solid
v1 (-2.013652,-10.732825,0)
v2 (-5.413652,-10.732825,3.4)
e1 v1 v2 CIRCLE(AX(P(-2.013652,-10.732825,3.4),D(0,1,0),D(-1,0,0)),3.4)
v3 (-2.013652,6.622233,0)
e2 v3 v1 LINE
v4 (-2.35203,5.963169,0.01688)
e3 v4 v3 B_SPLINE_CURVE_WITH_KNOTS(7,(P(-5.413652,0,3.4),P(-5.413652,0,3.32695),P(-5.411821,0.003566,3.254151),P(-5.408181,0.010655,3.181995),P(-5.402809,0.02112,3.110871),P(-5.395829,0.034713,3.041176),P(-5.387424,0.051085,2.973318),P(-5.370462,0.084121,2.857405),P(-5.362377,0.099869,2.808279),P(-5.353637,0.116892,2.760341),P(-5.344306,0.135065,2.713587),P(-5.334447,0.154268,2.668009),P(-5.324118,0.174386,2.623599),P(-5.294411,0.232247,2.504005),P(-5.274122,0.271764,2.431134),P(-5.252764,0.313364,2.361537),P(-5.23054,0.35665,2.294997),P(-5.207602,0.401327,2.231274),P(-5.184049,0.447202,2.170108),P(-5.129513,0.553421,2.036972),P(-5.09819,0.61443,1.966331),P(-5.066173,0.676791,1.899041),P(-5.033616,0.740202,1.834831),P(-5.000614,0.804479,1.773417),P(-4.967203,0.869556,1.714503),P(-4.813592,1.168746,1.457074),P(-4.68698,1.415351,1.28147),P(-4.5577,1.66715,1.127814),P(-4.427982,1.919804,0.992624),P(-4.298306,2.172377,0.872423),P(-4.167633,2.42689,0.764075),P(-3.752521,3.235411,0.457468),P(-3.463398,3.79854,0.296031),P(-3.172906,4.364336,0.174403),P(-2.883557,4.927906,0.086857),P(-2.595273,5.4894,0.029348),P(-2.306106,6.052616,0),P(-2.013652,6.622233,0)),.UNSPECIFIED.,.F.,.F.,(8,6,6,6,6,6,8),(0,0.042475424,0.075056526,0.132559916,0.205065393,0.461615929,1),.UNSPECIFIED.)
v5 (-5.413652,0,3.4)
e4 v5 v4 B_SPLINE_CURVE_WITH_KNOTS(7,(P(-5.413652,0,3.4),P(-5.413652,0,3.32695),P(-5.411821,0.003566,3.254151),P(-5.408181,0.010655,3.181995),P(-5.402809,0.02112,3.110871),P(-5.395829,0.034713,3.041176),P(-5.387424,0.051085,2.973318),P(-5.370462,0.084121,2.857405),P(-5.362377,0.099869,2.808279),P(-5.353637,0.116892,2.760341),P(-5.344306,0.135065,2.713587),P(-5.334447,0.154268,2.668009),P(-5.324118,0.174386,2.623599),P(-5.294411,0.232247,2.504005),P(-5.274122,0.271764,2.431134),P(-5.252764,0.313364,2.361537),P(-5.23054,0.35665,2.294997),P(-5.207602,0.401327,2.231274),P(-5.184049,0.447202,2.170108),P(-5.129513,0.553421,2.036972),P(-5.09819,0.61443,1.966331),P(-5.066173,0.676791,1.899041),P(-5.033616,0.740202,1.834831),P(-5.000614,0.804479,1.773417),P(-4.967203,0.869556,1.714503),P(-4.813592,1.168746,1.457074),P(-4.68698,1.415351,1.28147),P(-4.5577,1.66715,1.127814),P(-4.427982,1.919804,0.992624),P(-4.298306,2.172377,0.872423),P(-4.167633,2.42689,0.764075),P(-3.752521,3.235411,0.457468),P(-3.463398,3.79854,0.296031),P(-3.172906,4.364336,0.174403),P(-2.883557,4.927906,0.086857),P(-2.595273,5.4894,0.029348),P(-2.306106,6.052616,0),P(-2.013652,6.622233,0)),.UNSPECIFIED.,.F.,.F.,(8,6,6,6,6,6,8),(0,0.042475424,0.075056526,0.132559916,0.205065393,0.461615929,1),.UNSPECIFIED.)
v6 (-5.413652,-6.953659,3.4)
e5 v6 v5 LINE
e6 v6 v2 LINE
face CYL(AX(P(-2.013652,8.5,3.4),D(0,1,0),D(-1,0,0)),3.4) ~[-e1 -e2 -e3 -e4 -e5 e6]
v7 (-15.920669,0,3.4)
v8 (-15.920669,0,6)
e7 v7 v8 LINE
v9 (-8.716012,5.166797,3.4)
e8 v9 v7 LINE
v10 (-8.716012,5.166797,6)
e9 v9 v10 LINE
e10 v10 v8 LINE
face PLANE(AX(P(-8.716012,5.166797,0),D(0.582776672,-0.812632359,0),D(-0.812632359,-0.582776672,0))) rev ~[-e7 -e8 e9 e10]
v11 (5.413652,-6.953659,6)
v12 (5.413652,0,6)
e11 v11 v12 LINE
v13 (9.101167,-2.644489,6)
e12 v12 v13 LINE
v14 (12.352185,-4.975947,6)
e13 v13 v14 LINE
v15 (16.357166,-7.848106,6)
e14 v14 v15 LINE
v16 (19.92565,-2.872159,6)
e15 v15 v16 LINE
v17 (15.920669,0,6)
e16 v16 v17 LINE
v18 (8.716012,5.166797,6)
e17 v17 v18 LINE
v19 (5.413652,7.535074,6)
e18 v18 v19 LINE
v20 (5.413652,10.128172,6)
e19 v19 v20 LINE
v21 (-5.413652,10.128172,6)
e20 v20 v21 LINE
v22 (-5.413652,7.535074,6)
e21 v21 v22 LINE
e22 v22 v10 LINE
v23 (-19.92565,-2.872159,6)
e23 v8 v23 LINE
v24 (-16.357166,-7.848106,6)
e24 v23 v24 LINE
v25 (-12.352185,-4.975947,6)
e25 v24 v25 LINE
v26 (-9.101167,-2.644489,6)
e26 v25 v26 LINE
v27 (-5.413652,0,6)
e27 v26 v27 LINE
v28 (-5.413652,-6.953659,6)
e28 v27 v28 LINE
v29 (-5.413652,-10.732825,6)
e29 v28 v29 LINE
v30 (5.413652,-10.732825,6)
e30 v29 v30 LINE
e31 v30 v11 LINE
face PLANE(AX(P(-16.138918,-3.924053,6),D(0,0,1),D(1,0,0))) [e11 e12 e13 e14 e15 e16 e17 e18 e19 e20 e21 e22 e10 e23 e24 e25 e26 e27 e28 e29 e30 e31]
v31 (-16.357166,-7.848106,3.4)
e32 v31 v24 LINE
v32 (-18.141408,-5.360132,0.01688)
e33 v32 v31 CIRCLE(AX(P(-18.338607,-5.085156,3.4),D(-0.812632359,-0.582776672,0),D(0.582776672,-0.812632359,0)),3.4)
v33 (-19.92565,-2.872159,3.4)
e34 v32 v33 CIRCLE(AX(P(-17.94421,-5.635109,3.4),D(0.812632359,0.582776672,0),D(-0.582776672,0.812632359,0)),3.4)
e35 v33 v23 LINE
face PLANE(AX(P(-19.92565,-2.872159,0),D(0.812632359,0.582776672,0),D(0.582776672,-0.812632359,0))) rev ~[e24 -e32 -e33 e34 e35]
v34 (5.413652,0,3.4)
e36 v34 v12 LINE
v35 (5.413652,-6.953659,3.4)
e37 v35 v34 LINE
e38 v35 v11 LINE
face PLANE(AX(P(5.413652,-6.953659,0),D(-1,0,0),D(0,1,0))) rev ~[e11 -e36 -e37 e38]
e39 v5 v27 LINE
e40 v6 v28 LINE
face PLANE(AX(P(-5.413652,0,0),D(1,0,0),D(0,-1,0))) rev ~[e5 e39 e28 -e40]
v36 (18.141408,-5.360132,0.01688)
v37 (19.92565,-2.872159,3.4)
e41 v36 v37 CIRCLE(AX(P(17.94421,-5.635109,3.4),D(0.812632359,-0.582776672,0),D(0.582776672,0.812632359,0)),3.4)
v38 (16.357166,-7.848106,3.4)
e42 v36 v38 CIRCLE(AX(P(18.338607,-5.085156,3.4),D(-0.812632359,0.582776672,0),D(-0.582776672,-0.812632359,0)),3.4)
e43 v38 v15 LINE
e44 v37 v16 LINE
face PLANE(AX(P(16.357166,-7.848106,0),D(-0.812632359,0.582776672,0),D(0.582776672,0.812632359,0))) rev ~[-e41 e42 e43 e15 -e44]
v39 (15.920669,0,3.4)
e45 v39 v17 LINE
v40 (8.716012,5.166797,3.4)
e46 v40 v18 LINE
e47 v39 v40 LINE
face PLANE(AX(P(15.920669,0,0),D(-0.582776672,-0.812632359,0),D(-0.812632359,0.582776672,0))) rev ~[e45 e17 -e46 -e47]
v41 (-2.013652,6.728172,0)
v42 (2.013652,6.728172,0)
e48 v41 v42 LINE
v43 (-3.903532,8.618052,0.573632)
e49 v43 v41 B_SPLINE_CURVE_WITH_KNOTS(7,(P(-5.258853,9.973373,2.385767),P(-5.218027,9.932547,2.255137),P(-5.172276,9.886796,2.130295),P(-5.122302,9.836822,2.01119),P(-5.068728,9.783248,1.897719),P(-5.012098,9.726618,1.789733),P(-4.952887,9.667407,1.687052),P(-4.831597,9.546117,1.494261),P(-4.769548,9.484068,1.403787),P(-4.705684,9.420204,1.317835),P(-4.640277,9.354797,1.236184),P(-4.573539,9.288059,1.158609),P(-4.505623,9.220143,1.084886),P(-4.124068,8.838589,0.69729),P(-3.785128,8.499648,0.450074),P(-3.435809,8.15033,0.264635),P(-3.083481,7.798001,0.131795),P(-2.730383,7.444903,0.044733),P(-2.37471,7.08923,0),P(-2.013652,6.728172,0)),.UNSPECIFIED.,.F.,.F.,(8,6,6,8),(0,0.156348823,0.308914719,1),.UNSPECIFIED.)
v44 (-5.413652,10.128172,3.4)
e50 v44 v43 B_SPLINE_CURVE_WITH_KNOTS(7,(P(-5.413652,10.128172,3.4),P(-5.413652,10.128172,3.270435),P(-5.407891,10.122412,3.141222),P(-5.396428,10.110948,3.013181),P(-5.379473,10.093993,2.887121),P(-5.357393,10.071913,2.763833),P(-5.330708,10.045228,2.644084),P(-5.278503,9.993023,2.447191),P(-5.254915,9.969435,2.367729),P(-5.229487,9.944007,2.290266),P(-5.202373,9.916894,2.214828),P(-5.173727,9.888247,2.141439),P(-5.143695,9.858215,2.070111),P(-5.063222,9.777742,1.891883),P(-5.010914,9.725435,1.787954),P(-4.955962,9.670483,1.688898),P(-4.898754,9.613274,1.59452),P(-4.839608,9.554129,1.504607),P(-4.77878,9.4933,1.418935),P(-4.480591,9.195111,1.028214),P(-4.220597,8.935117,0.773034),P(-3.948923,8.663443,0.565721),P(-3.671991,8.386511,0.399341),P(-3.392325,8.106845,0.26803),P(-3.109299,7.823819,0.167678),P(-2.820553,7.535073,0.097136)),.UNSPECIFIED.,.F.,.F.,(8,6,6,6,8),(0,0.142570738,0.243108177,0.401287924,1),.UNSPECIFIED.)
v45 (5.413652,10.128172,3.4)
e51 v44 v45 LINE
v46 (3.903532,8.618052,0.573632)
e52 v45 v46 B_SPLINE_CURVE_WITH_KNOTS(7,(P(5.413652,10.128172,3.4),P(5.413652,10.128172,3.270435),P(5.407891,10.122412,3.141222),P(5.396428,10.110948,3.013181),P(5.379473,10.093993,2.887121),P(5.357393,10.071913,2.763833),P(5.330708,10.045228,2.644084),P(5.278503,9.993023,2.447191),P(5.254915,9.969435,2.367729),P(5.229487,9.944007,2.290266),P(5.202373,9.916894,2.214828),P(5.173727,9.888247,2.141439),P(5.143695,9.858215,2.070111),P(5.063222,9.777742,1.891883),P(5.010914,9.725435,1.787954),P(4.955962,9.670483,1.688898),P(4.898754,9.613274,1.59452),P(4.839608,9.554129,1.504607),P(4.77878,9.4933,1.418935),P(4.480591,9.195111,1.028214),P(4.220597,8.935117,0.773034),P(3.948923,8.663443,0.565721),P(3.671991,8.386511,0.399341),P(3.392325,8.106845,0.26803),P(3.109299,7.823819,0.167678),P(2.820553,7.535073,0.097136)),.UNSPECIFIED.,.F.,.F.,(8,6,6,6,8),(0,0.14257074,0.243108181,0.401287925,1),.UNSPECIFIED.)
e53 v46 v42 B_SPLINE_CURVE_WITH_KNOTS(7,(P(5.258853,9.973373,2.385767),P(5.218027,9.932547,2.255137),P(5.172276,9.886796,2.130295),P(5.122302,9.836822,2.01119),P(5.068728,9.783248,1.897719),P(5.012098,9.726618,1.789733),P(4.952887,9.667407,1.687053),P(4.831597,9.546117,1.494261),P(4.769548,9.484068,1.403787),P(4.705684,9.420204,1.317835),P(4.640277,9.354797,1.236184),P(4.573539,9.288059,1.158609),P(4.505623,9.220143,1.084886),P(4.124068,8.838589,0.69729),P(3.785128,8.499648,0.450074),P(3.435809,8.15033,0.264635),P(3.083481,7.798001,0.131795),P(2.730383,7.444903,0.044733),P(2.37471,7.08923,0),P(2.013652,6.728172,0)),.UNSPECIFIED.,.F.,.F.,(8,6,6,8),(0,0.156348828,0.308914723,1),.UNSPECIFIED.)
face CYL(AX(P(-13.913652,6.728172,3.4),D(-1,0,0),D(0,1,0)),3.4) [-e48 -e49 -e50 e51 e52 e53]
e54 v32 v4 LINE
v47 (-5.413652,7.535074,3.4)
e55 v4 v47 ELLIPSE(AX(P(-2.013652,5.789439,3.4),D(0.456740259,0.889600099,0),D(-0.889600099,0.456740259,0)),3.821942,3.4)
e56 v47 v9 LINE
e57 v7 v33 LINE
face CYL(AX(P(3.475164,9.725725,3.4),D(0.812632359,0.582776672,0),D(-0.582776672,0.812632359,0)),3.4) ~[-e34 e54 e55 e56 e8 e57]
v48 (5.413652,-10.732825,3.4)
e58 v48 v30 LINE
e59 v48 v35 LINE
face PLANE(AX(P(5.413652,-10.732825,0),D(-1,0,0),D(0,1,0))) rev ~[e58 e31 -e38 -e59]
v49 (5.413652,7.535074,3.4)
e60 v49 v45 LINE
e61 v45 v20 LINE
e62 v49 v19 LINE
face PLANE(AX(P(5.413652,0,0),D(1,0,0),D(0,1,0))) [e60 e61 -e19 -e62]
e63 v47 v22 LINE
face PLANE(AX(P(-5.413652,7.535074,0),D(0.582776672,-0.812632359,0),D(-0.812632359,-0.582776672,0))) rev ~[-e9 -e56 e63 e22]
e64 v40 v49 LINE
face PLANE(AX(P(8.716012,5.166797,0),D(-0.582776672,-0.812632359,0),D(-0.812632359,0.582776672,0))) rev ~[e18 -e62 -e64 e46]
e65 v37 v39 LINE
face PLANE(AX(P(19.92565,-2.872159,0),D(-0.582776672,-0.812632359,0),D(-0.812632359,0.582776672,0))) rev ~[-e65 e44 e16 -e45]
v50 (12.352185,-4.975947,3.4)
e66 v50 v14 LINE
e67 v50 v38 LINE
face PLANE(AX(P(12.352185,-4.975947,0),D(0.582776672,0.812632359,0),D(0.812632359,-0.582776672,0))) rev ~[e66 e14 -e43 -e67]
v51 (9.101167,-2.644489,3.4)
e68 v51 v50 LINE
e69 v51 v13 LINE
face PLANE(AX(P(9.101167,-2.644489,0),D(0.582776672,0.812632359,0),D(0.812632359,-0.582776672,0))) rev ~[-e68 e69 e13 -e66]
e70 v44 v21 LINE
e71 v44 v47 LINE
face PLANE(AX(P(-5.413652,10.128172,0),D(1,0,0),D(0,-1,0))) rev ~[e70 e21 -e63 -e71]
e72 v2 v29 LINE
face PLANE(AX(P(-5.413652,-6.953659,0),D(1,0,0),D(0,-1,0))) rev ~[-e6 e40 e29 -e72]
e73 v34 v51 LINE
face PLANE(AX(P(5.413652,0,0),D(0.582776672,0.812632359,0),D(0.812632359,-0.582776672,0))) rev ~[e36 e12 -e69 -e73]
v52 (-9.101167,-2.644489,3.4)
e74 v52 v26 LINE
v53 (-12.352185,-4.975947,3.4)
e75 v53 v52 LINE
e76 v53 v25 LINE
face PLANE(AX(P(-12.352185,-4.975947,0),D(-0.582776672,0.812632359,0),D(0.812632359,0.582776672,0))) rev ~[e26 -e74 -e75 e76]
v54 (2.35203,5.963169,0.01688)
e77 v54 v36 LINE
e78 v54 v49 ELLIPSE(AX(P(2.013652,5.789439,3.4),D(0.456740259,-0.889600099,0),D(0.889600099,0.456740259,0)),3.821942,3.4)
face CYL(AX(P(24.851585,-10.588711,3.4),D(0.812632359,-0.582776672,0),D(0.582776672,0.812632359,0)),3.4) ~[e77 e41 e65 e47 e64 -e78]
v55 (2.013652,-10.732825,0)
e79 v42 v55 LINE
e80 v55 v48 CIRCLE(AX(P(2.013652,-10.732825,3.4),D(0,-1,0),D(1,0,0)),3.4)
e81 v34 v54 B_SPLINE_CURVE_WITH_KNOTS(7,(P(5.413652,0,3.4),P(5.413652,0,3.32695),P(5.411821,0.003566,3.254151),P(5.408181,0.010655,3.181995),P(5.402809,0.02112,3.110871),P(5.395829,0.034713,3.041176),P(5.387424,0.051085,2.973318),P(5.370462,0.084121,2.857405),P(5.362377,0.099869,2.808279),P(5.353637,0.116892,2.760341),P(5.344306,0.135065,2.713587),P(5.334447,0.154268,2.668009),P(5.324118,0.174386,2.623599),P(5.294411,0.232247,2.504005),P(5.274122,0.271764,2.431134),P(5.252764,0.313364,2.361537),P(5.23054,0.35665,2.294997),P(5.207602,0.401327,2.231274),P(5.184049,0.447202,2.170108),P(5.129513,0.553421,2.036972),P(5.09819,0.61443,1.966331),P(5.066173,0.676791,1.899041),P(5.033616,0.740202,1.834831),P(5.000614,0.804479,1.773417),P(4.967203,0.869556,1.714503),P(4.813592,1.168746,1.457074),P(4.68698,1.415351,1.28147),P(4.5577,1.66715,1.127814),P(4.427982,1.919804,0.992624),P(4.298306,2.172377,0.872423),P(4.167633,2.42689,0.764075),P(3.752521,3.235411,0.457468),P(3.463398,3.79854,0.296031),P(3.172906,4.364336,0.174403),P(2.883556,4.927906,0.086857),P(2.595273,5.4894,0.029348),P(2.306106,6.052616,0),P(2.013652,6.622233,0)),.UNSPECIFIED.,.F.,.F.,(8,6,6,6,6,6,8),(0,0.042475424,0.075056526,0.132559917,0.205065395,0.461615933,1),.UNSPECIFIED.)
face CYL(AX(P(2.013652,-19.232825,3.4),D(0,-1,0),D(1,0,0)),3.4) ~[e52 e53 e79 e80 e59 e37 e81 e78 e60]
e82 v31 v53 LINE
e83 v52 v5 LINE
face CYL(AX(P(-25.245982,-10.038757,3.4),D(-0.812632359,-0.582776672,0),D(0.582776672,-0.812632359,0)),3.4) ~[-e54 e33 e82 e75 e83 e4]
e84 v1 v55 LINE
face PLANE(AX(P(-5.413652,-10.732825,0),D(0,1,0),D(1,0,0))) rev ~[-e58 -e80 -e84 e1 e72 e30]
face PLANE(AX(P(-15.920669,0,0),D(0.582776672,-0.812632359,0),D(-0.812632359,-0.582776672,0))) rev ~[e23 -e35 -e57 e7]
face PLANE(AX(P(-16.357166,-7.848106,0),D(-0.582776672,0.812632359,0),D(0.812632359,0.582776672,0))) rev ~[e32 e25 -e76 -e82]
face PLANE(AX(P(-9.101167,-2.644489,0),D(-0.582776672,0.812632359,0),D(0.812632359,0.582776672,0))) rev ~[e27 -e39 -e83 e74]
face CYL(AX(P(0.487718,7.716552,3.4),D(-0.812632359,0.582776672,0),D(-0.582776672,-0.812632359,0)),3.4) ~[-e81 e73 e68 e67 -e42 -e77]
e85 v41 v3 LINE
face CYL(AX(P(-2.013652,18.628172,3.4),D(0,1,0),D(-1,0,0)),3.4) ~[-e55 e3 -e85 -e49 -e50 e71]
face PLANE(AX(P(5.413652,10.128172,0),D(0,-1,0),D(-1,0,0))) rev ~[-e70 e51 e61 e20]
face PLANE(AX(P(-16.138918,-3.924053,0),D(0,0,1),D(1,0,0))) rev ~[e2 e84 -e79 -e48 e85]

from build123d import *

# Parameters (mm, degrees)
F0_W          = 10.8273038641
F0_H          = 3.767536847
F0_H_2        = 3.7791659124
F0_H_3        = 3.1744926237
F1_DEPTH      = 6
F2_T1_DEPTH   = 27.8273038641
F2_T6_DEPTH   = 34.8580118286
F2_T11_DEPTH  = 30.4667466587
F2_T16_DEPTH  = 27.7328249142
F2_T21_DEPTH  = 27.7328249142
F2_T26_DEPTH  = 27.7328249142
F2_T31_DEPTH  = 27.7328249142
F2_T36_DEPTH  = 30.4667466587
F2_T41_DEPTH  = 34.8580118286
F2_T46_DEPTH  = 19.5930984205
F2_T51_DEPTH  = 19.5930984205
F2_T56_DEPTH  = 19.5930984205
F2_T61_DEPTH  = 19.5930984205
F2_T67_DEPTH  = 34.8580118286
F2_T71_DEPTH  = 19.5930984205
F2_T79_DEPTH  = 27.7328249142
F2_T84_DEPTH  = 30.4667466587
F2_T91_DEPTH  = 30.4667466587
F2_T95_DEPTH  = 27.7328249142
F2_T103_DEPTH = 19.5930984205
F2_T108_DEPTH = 34.8580118286


# Not quite as in the source:
# - a fillet or chamfer that OpenCascade refuses, or shapes differently, is made with other operations: its cross-section is extruded or revolved along the edge and cut away or added


with BuildPart() as f1:
    # F0 (on Top) → F1 (new body)
    with BuildSketch(Plane.XY):
        Polygon((-16.3571660357, -7.848105799), (-12.3521852931, -4.9759467929), (-15.9206694666, 0), (-19.9256502092, -2.8721590061), align=None)
        Polygon((-12.3521852931, -4.9759467929), (-9.1011668972, -2.644489449), (-12.6696510706, 2.331457344), (-15.9206694666, 0), align=None)
        Polygon((-9.1011668972, -2.644489449), (-5.413651932, 0), (-8.7160122578, 5.1667966509), (-12.6696510706, 2.331457344), align=None)
        Polygon((-8.7160122578, 5.1667966509), (-5.413651932, 0), (-5.413651932, 3.767536847), (-5.413651932, 7.535073694), align=None)
        Polygon((-5.413651932, 7.535073694), (-5.413651932, 3.767536847), (5.413651932, 3.767536847), (5.413651932, 7.535073694), (0, 7.535073694), align=None)
        Polygon((-5.413651932, 10.1281721145), (-5.413651932, 7.535073694), (0, 7.535073694), (5.413651932, 7.535073694), (5.413651932, 10.1281721145), (0, 10.1281721145), align=None)
        Polygon((5.413651932, 3.767536847), (5.413651932, 0), (8.7160122578, 5.1667966509), (5.413651932, 7.535073694), align=None)
        Polygon((8.7160122578, 5.1667966509), (5.413651932, 0), (9.1011668972, -2.644489449), (12.6696510706, 2.331457344), align=None)
        Polygon((12.6696510706, 2.331457344), (9.1011668972, -2.644489449), (12.3521852931, -4.9759467929), (15.9206694666, 0), align=None)
        Polygon((15.9206694666, 0), (12.3521852931, -4.9759467929), (16.3571660357, -7.848105799), (19.9256502092, -2.8721590061), align=None)
        with Locations((0, 1.8837684235)):
            Rectangle(F0_W, F0_H)
        with Locations((0, -5.0640755799)):
            Rectangle(F0_W, F0_H_2)
        with Locations((0, -1.5872463118)):
            Rectangle(F0_W, F0_H_3)
        Polygon((5.413651932, -6.9536585361), (-5.413651932, -6.9536585361), (-5.413651932, -10.7328249142), (0, -10.7328249142), (5.413651932, -10.7328249142), align=None)
    extrude(amount=F1_DEPTH)

    # F2: fillet of radius 3.4 on 9 edges, made by hand

    # F2_s2 → F2_t1 (cut)
    with BuildSketch(Plane.YZ.offset(-13.913651932)):
        with BuildLine():
            ThreePointArc((10.1281721145, 3.4), (9.1323351705, 0.995836944), (6.7281721145, 0))
            Line((6.7281721145, 0), (10.1281721145, 0))
            Line((10.1281721145, 0), (10.1281721145, 3.4))
        make_face()
    extrude(amount=F2_T1_DEPTH, mode=Mode.SUBTRACT)


with BuildPart() as f2_tool4:
    # F2_s5 → F2_t6 (new body)
    with BuildSketch(Plane(origin=(21.4259097927, -15.365522016, 0), x_dir=(0, 0, 1), z_dir=(-0.8126323589, 0.5827766719, 0))):
        with BuildLine():
            ThreePointArc((3.4, 9.278194766), (0.995836944, 8.2823578221), (0, 5.878194766))
            Line((0, 5.878194766), (0, 9.278194766))
            Line((0, 9.278194766), (3.4, 9.278194766))
        make_face()
    extrude(amount=F2_T6_DEPTH)

    split(bisect_by=Plane.YZ.offset(5.413651932), keep=Keep.TOP)


with BuildPart() as f1_1:
    add(f1.part)

    # F2_t3: cut F2_tool4
    add(f2_tool4.part, mode=Mode.SUBTRACT)


with BuildPart() as f2_tool9:
    # F2_s10 → F2_t11 (new body)
    with BuildSketch(Plane(origin=(-3.3323544119, 2.3897872052, 0), x_dir=(0, 0, 1), z_dir=(0.8126323589, -0.5827766719, 0))):
        with BuildLine():
            ThreePointArc((3.4, -3.1549500557), (0.995836944, -4.1507869997), (0, -6.5549500557))
            Line((0, -6.5549500557), (0, -3.1549500557))
            Line((0, -3.1549500557), (3.4, -3.1549500557))
        make_face()
    extrude(amount=F2_T11_DEPTH)

    split(bisect_by=Plane.YZ.offset(5.413651932), keep=Keep.TOP)


with BuildPart() as f1_2:
    add(f1_1.part)

    # F2_t8: cut F2_tool9
    add(f2_tool9.part, mode=Mode.SUBTRACT)


with BuildPart() as f2_tool14:
    # F2_s15 → F2_t16 (new body)
    with BuildSketch(Plane.XZ.offset(19.2328249142)):
        with BuildLine():
            ThreePointArc((5.413651932, 3.4), (4.4178149881, 0.995836944), (2.013651932, 0))
            Line((2.013651932, 0), (5.413651932, 0))
            Line((5.413651932, 0), (5.413651932, 3.4))
        make_face()
    extrude(amount=-F2_T16_DEPTH)

    split(bisect_by=Plane(origin=(1.8386312935, 2.5638145059, 0), x_dir=(0, 0, 1), z_dir=(-0.5827766719, -0.8126323589, 0)), keep=Keep.TOP)


with BuildPart() as f1_3:
    add(f1_2.part)

    # F2_t13: cut F2_tool14
    add(f2_tool14.part, mode=Mode.SUBTRACT)


with BuildPart() as f2_tool19:
    # F2_s20 → F2_t21 (new body)
    with BuildSketch(Plane.XZ.offset(19.2328249142)):
        with BuildLine():
            ThreePointArc((5.413651932, 3.4), (4.4178149881, 0.995836944), (2.013651932, 0))
            Line((2.013651932, 0), (5.413651932, 0))
            Line((5.413651932, 0), (5.413651932, 3.4))
        make_face()
    extrude(amount=-F2_T21_DEPTH)

    split(bisect_by=Plane(origin=(5.4071154669, 7.5397612989, 0), x_dir=(0, 0, 1), z_dir=(0.5827766719, 0.8126323589, 0)), keep=Keep.TOP)


with BuildPart() as f1_4:
    add(f1_3.part)

    # F2_t18: cut F2_tool19
    add(f2_tool19.part, mode=Mode.SUBTRACT)


with BuildPart() as f2_tool24:
    # F2_s25 → F2_t26 (new body)
    with BuildSketch(Plane.XZ.offset(-8.5)):
        with BuildLine():
            ThreePointArc((-5.413651932, 3.4), (-4.4178149881, 0.995836944), (-2.013651932, 0))
            Line((-2.013651932, 0), (-5.413651932, 0))
            Line((-5.413651932, 0), (-5.413651932, 3.4))
        make_face()
    extrude(amount=F2_T26_DEPTH)

    split(bisect_by=Plane(origin=(-5.4071154669, 7.5397612989, 0), x_dir=(0, 0, 1), z_dir=(-0.5827766719, 0.8126323589, 0)), keep=Keep.TOP)


with BuildPart() as f1_5:
    add(f1_4.part)

    # F2_t23: cut F2_tool24
    add(f2_tool24.part, mode=Mode.SUBTRACT)


with BuildPart() as f2_tool29:
    # F2_s30 → F2_t31 (new body)
    with BuildSketch(Plane.XZ.offset(-8.5)):
        with BuildLine():
            ThreePointArc((-5.413651932, 3.4), (-4.4178149881, 0.995836944), (-2.013651932, 0))
            Line((-2.013651932, 0), (-5.413651932, 0))
            Line((-5.413651932, 0), (-5.413651932, 3.4))
        make_face()
    extrude(amount=F2_T31_DEPTH)

    split(bisect_by=Plane(origin=(-1.8386312935, 2.5638145059, 0), x_dir=(0, 0, 1), z_dir=(0.5827766719, -0.8126323589, 0)), keep=Keep.TOP)


with BuildPart() as f1_6:
    add(f1_5.part)

    # F2_t28: cut F2_tool29
    add(f2_tool29.part, mode=Mode.SUBTRACT)


with BuildPart() as f2_tool34:
    # F2_s35 → F2_t36 (new body)
    with BuildSketch(Plane(origin=(-21.4259097927, -15.365522016, 0), x_dir=(0, 0, 1), z_dir=(0.8126323589, 0.5827766719, 0))):
        with BuildLine():
            ThreePointArc((3.4, -3.1549500557), (0.995836944, -4.1507869997), (0, -6.5549500557))
            Line((0, -6.5549500557), (0, -3.1549500557))
            Line((0, -3.1549500557), (3.4, -3.1549500557))
        make_face()
    extrude(amount=F2_T36_DEPTH)

    split(bisect_by=Plane.YZ.offset(-5.413651932), keep=Keep.BOTTOM)


with BuildPart() as f1_7:
    add(f1_6.part)

    # F2_t33: cut F2_tool34
    add(f2_tool34.part, mode=Mode.SUBTRACT)


with BuildPart() as f2_tool39:
    # F2_s40 → F2_t41 (new body)
    with BuildSketch(Plane(origin=(6.9008385854, 4.9489141062, 0), x_dir=(0, 0, 1), z_dir=(-0.8126323589, -0.5827766719, 0))):
        with BuildLine():
            ThreePointArc((3.4, 9.278194766), (0.995836944, 8.2823578221), (0, 5.878194766))
            Line((0, 5.878194766), (0, 9.278194766))
            Line((0, 9.278194766), (3.4, 9.278194766))
        make_face()
    extrude(amount=F2_T41_DEPTH)

    split(bisect_by=Plane.YZ.offset(-5.413651932), keep=Keep.BOTTOM)


with BuildPart() as f1_8:
    add(f1_7.part)

    # F2_t38: cut F2_tool39
    add(f2_tool39.part, mode=Mode.SUBTRACT)


with BuildPart() as f2_tool44:
    # F2_s45 → F2_t46 (new body)
    with BuildSketch(Plane.XZ.offset(0.964926306)):
        with BuildLine():
            ThreePointArc((5.413651932, 3.4), (4.4178149881, 0.995836944), (2.013651932, 0))
            Line((2.013651932, 0), (5.413651932, 0))
            Line((5.413651932, 0), (5.413651932, 3.4))
        make_face()
    extrude(amount=-F2_T46_DEPTH)

    split(bisect_by=Plane(origin=(1.8386312935, 2.5638145059, 0), x_dir=(0, 0, 1), z_dir=(-0.5827766719, -0.8126323589, 0)), keep=Keep.TOP)


with BuildPart() as f1_9:
    add(f1_8.part)

    # F2_t43: cut F2_tool44
    add(f2_tool44.part, mode=Mode.SUBTRACT)


with BuildPart() as f2_tool49:
    # F2_s50 → F2_t51 (new body)
    with BuildSketch(Plane.XZ.offset(0.964926306)):
        with BuildLine():
            ThreePointArc((5.413651932, 3.4), (4.4178149881, 0.995836944), (2.013651932, 0))
            Line((2.013651932, 0), (5.413651932, 0))
            Line((5.413651932, 0), (5.413651932, 3.4))
        make_face()
    extrude(amount=-F2_T51_DEPTH)

    split(bisect_by=Plane(origin=(5.4071154669, 7.5397612989, 0), x_dir=(0, 0, 1), z_dir=(0.5827766719, 0.8126323589, 0)), keep=Keep.TOP)


with BuildPart() as f1_10:
    add(f1_9.part)

    # F2_t48: cut F2_tool49
    add(f2_tool49.part, mode=Mode.SUBTRACT)


with BuildPart() as f2_tool54:
    # F2_s55 → F2_t56 (new body)
    with BuildSketch(Plane.XZ.offset(-18.6281721145)):
        with BuildLine():
            ThreePointArc((-5.413651932, 3.4), (-4.4178149881, 0.995836944), (-2.013651932, 0))
            Line((-2.013651932, 0), (-5.413651932, 0))
            Line((-5.413651932, 0), (-5.413651932, 3.4))
        make_face()
    extrude(amount=F2_T56_DEPTH)

    split(bisect_by=Plane(origin=(-5.4071154669, 7.5397612989, 0), x_dir=(0, 0, 1), z_dir=(-0.5827766719, 0.8126323589, 0)), keep=Keep.TOP)


with BuildPart() as f1_11:
    add(f1_10.part)

    # F2_t53: cut F2_tool54
    add(f2_tool54.part, mode=Mode.SUBTRACT)


with BuildPart() as f2_tool59:
    # F2_s60 → F2_t61 (new body)
    with BuildSketch(Plane.XZ.offset(-18.6281721145)):
        with BuildLine():
            ThreePointArc((-5.413651932, 3.4), (-4.4178149881, 0.995836944), (-2.013651932, 0))
            Line((-2.013651932, 0), (-5.413651932, 0))
            Line((-5.413651932, 0), (-5.413651932, 3.4))
        make_face()
    extrude(amount=F2_T61_DEPTH)

    split(bisect_by=Plane(origin=(-1.8386312935, 2.5638145059, 0), x_dir=(0, 0, 1), z_dir=(0.5827766719, -0.8126323589, 0)), keep=Keep.TOP)


with BuildPart() as f1_12:
    add(f1_11.part)

    # F2_t58: cut F2_tool59
    add(f2_tool59.part, mode=Mode.SUBTRACT)


with BuildPart() as f2_tool65:
    # F2_s66 → F2_t67 (new body)
    with BuildSketch(Plane(origin=(21.4259097927, -15.365522016, 0), x_dir=(0, 0, 1), z_dir=(-0.8126323589, 0.5827766719, 0))):
        with BuildLine():
            ThreePointArc((3.4, 9.278194766), (0.995836944, 8.2823578221), (0, 5.878194766))
            Line((0, 5.878194766), (0, 9.278194766))
            Line((0, 9.278194766), (3.4, 9.278194766))
        make_face()
    extrude(amount=F2_T67_DEPTH)

    split(bisect_by=Plane.YZ.offset(5.413651932), keep=Keep.BOTTOM)


with BuildPart() as f2_tool69:
    # F2_s70 → F2_t71 (new body)
    with BuildSketch(Plane.XZ.offset(0.964926306)):
        with BuildLine():
            ThreePointArc((5.413651932, 3.4), (4.4178149881, 0.995836944), (2.013651932, 0))
            Line((2.013651932, 0), (5.413651932, 0))
            Line((5.413651932, 0), (5.413651932, 3.4))
        make_face()
    extrude(amount=-F2_T71_DEPTH)

    split(bisect_by=Plane(origin=(1.8386312935, 2.5638145059, 0), x_dir=(0, 0, 1), z_dir=(0.5827766719, 0.8126323589, 0)), keep=Keep.TOP)

    split(bisect_by=Plane(origin=(5.4071154669, 7.5397612989, 0), x_dir=(0, 0, 1), z_dir=(-0.5827766719, -0.8126323589, 0)), keep=Keep.TOP)


with BuildPart() as f2_tool65_1:
    add(f2_tool65.part)

    # F2_t74: intersect F2_tool69
    add(f2_tool69.part, mode=Mode.INTERSECT)


with BuildPart() as f1_13:
    add(f1_12.part)

    # F2_t63: cut F2_tool65
    add(f2_tool65_1.part, mode=Mode.SUBTRACT)


with BuildPart() as f2_tool77:
    # F2_s78 → F2_t79 (new body)
    with BuildSketch(Plane.XZ.offset(19.2328249142)):
        with BuildLine():
            ThreePointArc((5.413651932, 3.4), (4.4178149881, 0.995836944), (2.013651932, 0))
            Line((2.013651932, 0), (5.413651932, 0))
            Line((5.413651932, 0), (5.413651932, 3.4))
        make_face()
    extrude(amount=-F2_T79_DEPTH)

    split(bisect_by=Plane(origin=(1.8386312935, 2.5638145059, 0), x_dir=(0, 0, 1), z_dir=(0.5827766719, 0.8126323589, 0)), keep=Keep.TOP)

    split(bisect_by=Plane(origin=(5.4071154669, 7.5397612989, 0), x_dir=(0, 0, 1), z_dir=(-0.5827766719, -0.8126323589, 0)), keep=Keep.TOP)


with BuildPart() as f2_tool82:
    # F2_s83 → F2_t84 (new body)
    with BuildSketch(Plane(origin=(-3.3323544119, 2.3897872052, 0), x_dir=(0, 0, 1), z_dir=(0.8126323589, -0.5827766719, 0))):
        with BuildLine():
            ThreePointArc((3.4, -3.1549500557), (0.995836944, -4.1507869997), (0, -6.5549500557))
            Line((0, -6.5549500557), (0, -3.1549500557))
            Line((0, -3.1549500557), (3.4, -3.1549500557))
        make_face()
    extrude(amount=F2_T84_DEPTH)

    split(bisect_by=Plane.YZ.offset(5.413651932), keep=Keep.BOTTOM)


with BuildPart() as f2_tool77_1:
    add(f2_tool77.part)

    # F2_t86: intersect F2_tool82
    add(f2_tool82.part, mode=Mode.INTERSECT)


with BuildPart() as f1_14:
    add(f1_13.part)

    # F2_t75: cut F2_tool77
    add(f2_tool77_1.part, mode=Mode.SUBTRACT)


with BuildPart() as f2_tool89:
    # F2_s90 → F2_t91 (new body)
    with BuildSketch(Plane(origin=(-21.4259097927, -15.365522016, 0), x_dir=(0, 0, 1), z_dir=(0.8126323589, 0.5827766719, 0))):
        with BuildLine():
            ThreePointArc((3.4, -3.1549500557), (0.995836944, -4.1507869997), (0, -6.5549500557))
            Line((0, -6.5549500557), (0, -3.1549500557))
            Line((0, -3.1549500557), (3.4, -3.1549500557))
        make_face()
    extrude(amount=F2_T91_DEPTH)

    split(bisect_by=Plane.YZ.offset(-5.413651932), keep=Keep.TOP)


with BuildPart() as f2_tool93:
    # F2_s94 → F2_t95 (new body)
    with BuildSketch(Plane.XZ.offset(-8.5)):
        with BuildLine():
            ThreePointArc((-5.413651932, 3.4), (-4.4178149881, 0.995836944), (-2.013651932, 0))
            Line((-2.013651932, 0), (-5.413651932, 0))
            Line((-5.413651932, 0), (-5.413651932, 3.4))
        make_face()
    extrude(amount=F2_T95_DEPTH)

    split(bisect_by=Plane(origin=(-1.8386312935, 2.5638145059, 0), x_dir=(0, 0, 1), z_dir=(-0.5827766719, 0.8126323589, 0)), keep=Keep.TOP)

    split(bisect_by=Plane(origin=(-5.4071154669, 7.5397612989, 0), x_dir=(0, 0, 1), z_dir=(0.5827766719, -0.8126323589, 0)), keep=Keep.TOP)


with BuildPart() as f2_tool89_1:
    add(f2_tool89.part)

    # F2_t98: intersect F2_tool93
    add(f2_tool93.part, mode=Mode.INTERSECT)


with BuildPart() as f1_15:
    add(f1_14.part)

    # F2_t87: cut F2_tool89
    add(f2_tool89_1.part, mode=Mode.SUBTRACT)


with BuildPart() as f2_tool101:
    # F2_s102 → F2_t103 (new body)
    with BuildSketch(Plane.XZ.offset(-18.6281721145)):
        with BuildLine():
            ThreePointArc((-5.413651932, 3.4), (-4.4178149881, 0.995836944), (-2.013651932, 0))
            Line((-2.013651932, 0), (-5.413651932, 0))
            Line((-5.413651932, 0), (-5.413651932, 3.4))
        make_face()
    extrude(amount=F2_T103_DEPTH)

    split(bisect_by=Plane(origin=(-1.8386312935, 2.5638145059, 0), x_dir=(0, 0, 1), z_dir=(-0.5827766719, 0.8126323589, 0)), keep=Keep.TOP)

    split(bisect_by=Plane(origin=(-5.4071154669, 7.5397612989, 0), x_dir=(0, 0, 1), z_dir=(0.5827766719, -0.8126323589, 0)), keep=Keep.TOP)


with BuildPart() as f2_tool106:
    # F2_s107 → F2_t108 (new body)
    with BuildSketch(Plane(origin=(6.9008385854, 4.9489141062, 0), x_dir=(0, 0, 1), z_dir=(-0.8126323589, -0.5827766719, 0))):
        with BuildLine():
            ThreePointArc((3.4, 9.278194766), (0.995836944, 8.2823578221), (0, 5.878194766))
            Line((0, 5.878194766), (0, 9.278194766))
            Line((0, 9.278194766), (3.4, 9.278194766))
        make_face()
    extrude(amount=F2_T108_DEPTH)

    split(bisect_by=Plane.YZ.offset(-5.413651932), keep=Keep.TOP)


with BuildPart() as f2_tool101_1:
    add(f2_tool101.part)

    # F2_t110: intersect F2_tool106
    add(f2_tool106.part, mode=Mode.INTERSECT)


with BuildPart() as f1_16:
    add(f1_15.part)

    # F2_t99: cut F2_tool101
    add(f2_tool101_1.part, mode=Mode.SUBTRACT)


solid = f1_16.part
